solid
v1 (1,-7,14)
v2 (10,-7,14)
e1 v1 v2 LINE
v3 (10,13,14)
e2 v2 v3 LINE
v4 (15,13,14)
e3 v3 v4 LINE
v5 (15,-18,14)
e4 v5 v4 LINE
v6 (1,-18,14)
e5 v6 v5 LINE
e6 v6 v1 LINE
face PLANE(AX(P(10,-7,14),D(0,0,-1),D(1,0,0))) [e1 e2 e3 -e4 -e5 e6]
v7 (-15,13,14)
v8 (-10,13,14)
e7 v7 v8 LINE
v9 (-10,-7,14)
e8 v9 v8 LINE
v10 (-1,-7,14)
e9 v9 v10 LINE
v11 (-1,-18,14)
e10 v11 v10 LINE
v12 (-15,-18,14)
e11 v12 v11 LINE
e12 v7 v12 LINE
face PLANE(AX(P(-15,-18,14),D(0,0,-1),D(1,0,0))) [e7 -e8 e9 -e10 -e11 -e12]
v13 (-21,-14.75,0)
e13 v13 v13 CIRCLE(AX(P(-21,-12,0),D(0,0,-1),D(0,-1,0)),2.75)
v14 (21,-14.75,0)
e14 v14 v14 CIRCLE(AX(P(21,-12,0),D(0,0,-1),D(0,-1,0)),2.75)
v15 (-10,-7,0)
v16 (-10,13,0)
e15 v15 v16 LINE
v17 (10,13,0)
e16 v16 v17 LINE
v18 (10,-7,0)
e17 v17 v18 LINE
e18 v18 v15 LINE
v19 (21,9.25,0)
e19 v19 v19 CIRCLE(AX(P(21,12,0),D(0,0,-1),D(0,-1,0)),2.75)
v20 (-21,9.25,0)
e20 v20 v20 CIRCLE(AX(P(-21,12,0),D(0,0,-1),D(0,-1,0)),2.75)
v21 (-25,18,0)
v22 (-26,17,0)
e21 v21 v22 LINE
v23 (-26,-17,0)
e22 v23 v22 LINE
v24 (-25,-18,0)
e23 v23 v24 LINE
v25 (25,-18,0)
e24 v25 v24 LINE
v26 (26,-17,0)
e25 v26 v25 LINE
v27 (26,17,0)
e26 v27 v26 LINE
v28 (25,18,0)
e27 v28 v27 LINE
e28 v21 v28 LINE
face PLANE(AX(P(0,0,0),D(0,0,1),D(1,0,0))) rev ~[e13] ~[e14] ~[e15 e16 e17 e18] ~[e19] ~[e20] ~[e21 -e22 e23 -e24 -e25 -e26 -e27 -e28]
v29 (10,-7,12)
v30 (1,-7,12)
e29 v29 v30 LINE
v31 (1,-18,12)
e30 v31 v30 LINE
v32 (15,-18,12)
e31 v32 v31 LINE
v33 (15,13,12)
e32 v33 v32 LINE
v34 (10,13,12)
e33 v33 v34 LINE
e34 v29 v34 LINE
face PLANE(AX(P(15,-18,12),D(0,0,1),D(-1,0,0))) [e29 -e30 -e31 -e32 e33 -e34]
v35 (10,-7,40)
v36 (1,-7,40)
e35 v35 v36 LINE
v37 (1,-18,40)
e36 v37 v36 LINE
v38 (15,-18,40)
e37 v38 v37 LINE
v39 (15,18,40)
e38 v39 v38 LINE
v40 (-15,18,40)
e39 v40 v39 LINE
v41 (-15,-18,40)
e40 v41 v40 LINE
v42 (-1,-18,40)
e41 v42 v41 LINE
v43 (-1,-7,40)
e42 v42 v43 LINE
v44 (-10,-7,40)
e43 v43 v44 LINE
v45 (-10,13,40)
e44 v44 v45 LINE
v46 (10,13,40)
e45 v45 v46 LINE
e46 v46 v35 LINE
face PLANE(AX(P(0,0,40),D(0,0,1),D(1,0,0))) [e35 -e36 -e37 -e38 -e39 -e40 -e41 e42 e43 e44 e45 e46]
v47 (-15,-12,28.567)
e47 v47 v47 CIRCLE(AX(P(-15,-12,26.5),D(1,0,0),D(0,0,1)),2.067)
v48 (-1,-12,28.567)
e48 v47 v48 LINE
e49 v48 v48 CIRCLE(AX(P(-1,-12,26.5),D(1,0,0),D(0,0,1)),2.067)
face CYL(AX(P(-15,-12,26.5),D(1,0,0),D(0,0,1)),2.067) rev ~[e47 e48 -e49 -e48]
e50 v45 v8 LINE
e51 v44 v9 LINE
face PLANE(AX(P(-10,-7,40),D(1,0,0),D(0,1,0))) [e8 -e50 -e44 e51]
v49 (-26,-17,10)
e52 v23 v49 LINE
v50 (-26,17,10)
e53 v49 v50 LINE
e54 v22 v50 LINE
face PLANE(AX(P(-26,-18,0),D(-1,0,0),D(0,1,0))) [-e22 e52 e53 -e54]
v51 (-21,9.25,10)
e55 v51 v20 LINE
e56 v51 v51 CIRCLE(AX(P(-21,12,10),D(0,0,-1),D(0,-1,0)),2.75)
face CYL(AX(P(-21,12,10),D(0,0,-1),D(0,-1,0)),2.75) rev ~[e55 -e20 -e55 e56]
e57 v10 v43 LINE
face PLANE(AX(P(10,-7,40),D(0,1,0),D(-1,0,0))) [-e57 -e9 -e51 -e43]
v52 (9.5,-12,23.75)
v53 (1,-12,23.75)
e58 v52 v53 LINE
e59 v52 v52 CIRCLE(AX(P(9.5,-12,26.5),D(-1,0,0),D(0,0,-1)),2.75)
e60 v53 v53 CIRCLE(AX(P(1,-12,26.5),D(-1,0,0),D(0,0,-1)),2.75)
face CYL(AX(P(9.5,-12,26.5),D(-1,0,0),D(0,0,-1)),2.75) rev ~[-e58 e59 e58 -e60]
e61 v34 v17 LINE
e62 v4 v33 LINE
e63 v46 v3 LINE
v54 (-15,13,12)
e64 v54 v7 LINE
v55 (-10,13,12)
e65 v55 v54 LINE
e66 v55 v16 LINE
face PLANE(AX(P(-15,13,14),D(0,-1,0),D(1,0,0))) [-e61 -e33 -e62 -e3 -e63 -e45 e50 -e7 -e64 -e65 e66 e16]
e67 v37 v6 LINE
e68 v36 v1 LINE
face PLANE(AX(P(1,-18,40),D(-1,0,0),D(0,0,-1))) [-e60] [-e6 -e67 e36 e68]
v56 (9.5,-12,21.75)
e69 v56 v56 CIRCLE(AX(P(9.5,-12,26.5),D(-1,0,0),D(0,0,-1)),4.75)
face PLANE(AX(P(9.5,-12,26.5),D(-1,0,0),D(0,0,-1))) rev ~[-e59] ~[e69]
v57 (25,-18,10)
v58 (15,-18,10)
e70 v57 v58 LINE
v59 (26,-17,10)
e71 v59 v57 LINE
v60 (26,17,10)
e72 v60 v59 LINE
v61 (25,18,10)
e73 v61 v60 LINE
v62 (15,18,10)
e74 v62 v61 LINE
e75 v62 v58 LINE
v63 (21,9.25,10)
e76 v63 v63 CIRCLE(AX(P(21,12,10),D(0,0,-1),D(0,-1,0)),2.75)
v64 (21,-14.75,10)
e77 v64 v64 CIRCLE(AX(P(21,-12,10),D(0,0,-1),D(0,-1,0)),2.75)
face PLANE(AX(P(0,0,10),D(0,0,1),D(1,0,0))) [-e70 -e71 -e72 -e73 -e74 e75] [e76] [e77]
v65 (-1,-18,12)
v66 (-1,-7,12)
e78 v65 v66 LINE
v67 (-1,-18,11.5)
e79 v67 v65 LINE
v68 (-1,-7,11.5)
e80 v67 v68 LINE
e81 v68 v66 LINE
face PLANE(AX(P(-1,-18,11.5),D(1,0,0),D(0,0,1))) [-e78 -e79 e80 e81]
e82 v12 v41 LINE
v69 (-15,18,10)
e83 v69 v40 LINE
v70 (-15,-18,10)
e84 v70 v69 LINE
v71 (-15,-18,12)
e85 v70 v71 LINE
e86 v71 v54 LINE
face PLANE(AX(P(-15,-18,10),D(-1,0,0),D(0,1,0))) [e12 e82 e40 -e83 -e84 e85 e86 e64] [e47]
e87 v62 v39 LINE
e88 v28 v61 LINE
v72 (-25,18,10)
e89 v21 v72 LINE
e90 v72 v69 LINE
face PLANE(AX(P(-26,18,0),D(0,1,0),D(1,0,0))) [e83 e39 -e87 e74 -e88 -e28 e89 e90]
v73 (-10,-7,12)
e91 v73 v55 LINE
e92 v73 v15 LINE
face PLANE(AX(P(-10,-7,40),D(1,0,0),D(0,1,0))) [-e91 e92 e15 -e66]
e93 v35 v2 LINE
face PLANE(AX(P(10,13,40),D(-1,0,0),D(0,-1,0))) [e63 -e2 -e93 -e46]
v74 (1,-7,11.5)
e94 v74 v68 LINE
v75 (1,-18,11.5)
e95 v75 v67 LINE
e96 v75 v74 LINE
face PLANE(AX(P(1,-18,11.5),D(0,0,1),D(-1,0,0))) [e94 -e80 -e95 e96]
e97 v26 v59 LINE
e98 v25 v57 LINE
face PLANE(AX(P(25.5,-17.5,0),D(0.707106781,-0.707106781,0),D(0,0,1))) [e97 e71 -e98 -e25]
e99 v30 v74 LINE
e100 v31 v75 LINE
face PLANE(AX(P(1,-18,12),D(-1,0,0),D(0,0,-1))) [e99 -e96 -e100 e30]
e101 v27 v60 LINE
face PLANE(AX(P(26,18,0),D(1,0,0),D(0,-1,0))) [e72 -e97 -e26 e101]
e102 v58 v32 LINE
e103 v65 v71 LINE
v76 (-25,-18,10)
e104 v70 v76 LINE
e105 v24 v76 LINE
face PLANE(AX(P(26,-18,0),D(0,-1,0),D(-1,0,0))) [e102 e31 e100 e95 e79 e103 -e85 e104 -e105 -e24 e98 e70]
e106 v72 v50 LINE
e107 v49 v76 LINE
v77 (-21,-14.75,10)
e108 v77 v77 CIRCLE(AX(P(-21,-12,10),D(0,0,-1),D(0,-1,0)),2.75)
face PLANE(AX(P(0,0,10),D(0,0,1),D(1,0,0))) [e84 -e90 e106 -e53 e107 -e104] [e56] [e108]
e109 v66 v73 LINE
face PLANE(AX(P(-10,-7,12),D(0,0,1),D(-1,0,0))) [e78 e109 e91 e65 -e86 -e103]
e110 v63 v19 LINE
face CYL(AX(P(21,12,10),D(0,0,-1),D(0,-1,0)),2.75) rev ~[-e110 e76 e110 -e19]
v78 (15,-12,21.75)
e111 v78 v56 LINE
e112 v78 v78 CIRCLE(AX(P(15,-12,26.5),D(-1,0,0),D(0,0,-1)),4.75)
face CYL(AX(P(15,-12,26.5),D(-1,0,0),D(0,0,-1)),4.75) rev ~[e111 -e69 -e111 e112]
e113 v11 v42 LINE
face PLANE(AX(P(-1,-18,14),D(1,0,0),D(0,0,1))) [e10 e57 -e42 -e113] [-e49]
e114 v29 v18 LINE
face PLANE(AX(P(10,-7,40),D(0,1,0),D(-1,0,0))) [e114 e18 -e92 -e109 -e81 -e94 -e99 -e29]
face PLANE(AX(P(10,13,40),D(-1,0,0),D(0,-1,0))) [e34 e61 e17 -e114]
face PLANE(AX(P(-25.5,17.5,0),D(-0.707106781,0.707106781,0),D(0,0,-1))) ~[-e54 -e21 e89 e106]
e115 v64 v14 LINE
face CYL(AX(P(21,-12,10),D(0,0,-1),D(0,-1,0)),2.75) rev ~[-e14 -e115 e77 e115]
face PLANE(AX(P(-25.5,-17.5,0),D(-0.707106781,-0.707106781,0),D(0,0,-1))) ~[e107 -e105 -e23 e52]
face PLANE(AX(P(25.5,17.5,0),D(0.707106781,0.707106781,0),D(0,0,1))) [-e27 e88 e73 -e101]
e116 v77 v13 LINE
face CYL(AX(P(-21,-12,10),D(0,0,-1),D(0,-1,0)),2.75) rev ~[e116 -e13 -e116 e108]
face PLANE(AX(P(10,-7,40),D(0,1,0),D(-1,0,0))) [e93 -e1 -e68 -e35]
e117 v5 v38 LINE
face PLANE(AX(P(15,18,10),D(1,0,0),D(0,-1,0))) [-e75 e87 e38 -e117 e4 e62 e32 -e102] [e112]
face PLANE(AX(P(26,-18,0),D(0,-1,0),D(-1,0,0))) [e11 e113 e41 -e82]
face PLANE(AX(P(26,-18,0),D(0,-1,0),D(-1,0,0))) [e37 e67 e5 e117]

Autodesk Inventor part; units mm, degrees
ref_plane "YZ Plane" through (0, 0, 0) normal (1, 0, 0) x (0, 1, 0)
ref_plane "XZ Plane" through (0, 0, 0) normal (0, 1, 0) x (-1, 0, 0)
ref_plane "XY Plane" through (0, 0, 0) normal (0, 0, 1) x (1, 0, 0)
sketch "スケッチ1" plane through (0, 0, 0) normal (0, 0, 1) x (1, 0, 0)
  line L0 (-26, 18) -> (26, 18)
  line L1 (26, 18) -> (26, -18)
  line L2 (26, -18) -> (-26, -18)
  line L3 (-26, -18) -> (-26, 18)
  point P0 (0, 0)
  point P1 (0, -18)
  point P2 (-26, 0)
  dimension "d0" = 52
  dimension "d1" = 36
extrude "押し出し1" add sketch "スケッチ1" along normal blind 10
sketch "スケッチ2" plane through (0, 0, 10) normal (0, 0, 1) x (1, 0, 0)
  line L0 (-26, 18) -> (26, 18) projected
  line L1 (26, -18) -> (-26, -18) projected
  line L2 (-15, 18) -> (15, 18)
  line L3 (15, 18) -> (15, -18)
  line L4 (15, -18) -> (-15, -18)
  line L5 (-15, -18) -> (-15, 18)
  point P0 (0, 0)
  point P1 (0, -18)
  point P2 (0, -18)
  dimension "d4" = 30
extrude "押し出し2" add sketch "スケッチ2" along normal blind 30
sketch "スケッチ3" plane through (0, 0, 40) normal (0, 0, 1) x (1, 0, 0)
  line L0 (15, -18) -> (-15, -18) projected
  line L1 (-10, 13) -> (10, 13)
  line L2 (10, 13) -> (10, -7)
  line L3 (10, -7) -> (-10, -7)
  line L4 (-10, -7) -> (-10, 13)
  point P0 (0, 0)
  point P1 (0, -7)
  dimension "d7" = 20
  dimension "d8" = 20
  dimension "d9" = 11
extrude "押し出し3" cut sketch "スケッチ3" against normal through all
sketch "スケッチ4" plane through (0, 0, 10) normal (0, 0, 1) x (1, 0, 0)
  point P0 (0, 0)
  point P1 (-21, -12)
  dimension "d12" = 12
  dimension "d13" = 21
hole "穴1" at (-21, -12, 10) direction (0, 0, -1) diameter 5.5 end through all
pattern_linear "矩形状パターン1" count 2 spacing 42 along (1, 0, 0) count 2 spacing 24 along (0, 1, 0) of "穴1"
sketch "スケッチ5" plane through (-26, -18, 0) normal (0, -1, 0) x (1, 0, 0)
  line L0 (41, 10) -> (41, 40) projected
  line L1 (41, 40) -> (11, 40) projected
  line L2 (11, 10) -> (11, 40) projected
  line L3 (52, 0) -> (0, 0) projected
  line L4 (11, 14) -> (41, 14)
  line L5 (41, 14) -> (41, 12)
  line L6 (41, 12) -> (11, 12)
  line L7 (11, 12) -> (11, 14)
  line L8 (25, 40) -> (27, 40)
  line L9 (27, 40) -> (27, 11.5)
  line L10 (27, 11.5) -> (25, 11.5)
  line L11 (25, 11.5) -> (25, 40)
  point P0 (26, 0)
  point P1 (26, 11.5)
  point P2 (26, 0)
  dimension "d27" = 12
  dimension "d28" = 2
  dimension "d29" = 2
  dimension "d30" = 0.5
extrude "押し出し4" cut sketch "スケッチ5" against normal up to surface (11 mm away) contours L6 L9 L4 L0 | L9 L10 L11 L6 | L6 L11 L4 L9 | L4 L11 L1 L9 | L6 L2 L4 L11
sketch "スケッチ6" plane through (-15, -7, 14) normal (0, -1, 0) x (1, 0, 0)
  line L0 (5, 0) -> (5, -2) projected
  line L1 (0, 0) -> (5, 0) projected
  line L2 (0, -2) -> (0, 0) projected
  line L3 (5, -2) -> (0, -2) projected
  line L4 (25, 0) -> (25, -2) projected
  line L5 (30, -2) -> (25, -2) projected
  line L6 (30, 0) -> (30, -2) projected
  line L7 (25, 0) -> (30, 0) projected
  point P0 (15, -14)
extrude "押し出し5" cut sketch "スケッチ6" against normal up to surface (20 mm away)
sketch "スケッチ7" plane through (15, -18, 10) normal (1, 0, 0) x (0, 0, -1)
  line L0 (-4, 0) -> (-30, 0) projected
  line L1 (10, 36) -> (10, 0) projected
  point P0 (10, 18)
  point P1 (-16.5, 6)
  dimension "d35" = 26.5
  dimension "d36" = 6
hole "穴2" at (15, -12, 26.5) direction (-1, 0, 0) diameter 5.5 end up to surface counterbore diameter 9.5 counterbore depth 5.5
sketch "スケッチ8" plane through (-15, -18, 10) normal (-1, 0, 0) x (0, 0, 1)
  circle A0 centre (16.5, 6) radius 2.75 projected
  point P0 (-10, 18)
hole "穴3" at (-15, -12, 26.5) direction (1, 0, 0) diameter 4.134 end up to surface thread size "M5x0.8" class "6H" standard "ANSI Metric M Profile"
chamfer "面取り1" distance 1 angle 45 4 edges at (-26, 18, 5) (-26, -18, 5) (26, 18, 5) (26, -18, 5)
equation "\"d8\" = d7"
properties part number "CLQAM20" material "MISUMI"
